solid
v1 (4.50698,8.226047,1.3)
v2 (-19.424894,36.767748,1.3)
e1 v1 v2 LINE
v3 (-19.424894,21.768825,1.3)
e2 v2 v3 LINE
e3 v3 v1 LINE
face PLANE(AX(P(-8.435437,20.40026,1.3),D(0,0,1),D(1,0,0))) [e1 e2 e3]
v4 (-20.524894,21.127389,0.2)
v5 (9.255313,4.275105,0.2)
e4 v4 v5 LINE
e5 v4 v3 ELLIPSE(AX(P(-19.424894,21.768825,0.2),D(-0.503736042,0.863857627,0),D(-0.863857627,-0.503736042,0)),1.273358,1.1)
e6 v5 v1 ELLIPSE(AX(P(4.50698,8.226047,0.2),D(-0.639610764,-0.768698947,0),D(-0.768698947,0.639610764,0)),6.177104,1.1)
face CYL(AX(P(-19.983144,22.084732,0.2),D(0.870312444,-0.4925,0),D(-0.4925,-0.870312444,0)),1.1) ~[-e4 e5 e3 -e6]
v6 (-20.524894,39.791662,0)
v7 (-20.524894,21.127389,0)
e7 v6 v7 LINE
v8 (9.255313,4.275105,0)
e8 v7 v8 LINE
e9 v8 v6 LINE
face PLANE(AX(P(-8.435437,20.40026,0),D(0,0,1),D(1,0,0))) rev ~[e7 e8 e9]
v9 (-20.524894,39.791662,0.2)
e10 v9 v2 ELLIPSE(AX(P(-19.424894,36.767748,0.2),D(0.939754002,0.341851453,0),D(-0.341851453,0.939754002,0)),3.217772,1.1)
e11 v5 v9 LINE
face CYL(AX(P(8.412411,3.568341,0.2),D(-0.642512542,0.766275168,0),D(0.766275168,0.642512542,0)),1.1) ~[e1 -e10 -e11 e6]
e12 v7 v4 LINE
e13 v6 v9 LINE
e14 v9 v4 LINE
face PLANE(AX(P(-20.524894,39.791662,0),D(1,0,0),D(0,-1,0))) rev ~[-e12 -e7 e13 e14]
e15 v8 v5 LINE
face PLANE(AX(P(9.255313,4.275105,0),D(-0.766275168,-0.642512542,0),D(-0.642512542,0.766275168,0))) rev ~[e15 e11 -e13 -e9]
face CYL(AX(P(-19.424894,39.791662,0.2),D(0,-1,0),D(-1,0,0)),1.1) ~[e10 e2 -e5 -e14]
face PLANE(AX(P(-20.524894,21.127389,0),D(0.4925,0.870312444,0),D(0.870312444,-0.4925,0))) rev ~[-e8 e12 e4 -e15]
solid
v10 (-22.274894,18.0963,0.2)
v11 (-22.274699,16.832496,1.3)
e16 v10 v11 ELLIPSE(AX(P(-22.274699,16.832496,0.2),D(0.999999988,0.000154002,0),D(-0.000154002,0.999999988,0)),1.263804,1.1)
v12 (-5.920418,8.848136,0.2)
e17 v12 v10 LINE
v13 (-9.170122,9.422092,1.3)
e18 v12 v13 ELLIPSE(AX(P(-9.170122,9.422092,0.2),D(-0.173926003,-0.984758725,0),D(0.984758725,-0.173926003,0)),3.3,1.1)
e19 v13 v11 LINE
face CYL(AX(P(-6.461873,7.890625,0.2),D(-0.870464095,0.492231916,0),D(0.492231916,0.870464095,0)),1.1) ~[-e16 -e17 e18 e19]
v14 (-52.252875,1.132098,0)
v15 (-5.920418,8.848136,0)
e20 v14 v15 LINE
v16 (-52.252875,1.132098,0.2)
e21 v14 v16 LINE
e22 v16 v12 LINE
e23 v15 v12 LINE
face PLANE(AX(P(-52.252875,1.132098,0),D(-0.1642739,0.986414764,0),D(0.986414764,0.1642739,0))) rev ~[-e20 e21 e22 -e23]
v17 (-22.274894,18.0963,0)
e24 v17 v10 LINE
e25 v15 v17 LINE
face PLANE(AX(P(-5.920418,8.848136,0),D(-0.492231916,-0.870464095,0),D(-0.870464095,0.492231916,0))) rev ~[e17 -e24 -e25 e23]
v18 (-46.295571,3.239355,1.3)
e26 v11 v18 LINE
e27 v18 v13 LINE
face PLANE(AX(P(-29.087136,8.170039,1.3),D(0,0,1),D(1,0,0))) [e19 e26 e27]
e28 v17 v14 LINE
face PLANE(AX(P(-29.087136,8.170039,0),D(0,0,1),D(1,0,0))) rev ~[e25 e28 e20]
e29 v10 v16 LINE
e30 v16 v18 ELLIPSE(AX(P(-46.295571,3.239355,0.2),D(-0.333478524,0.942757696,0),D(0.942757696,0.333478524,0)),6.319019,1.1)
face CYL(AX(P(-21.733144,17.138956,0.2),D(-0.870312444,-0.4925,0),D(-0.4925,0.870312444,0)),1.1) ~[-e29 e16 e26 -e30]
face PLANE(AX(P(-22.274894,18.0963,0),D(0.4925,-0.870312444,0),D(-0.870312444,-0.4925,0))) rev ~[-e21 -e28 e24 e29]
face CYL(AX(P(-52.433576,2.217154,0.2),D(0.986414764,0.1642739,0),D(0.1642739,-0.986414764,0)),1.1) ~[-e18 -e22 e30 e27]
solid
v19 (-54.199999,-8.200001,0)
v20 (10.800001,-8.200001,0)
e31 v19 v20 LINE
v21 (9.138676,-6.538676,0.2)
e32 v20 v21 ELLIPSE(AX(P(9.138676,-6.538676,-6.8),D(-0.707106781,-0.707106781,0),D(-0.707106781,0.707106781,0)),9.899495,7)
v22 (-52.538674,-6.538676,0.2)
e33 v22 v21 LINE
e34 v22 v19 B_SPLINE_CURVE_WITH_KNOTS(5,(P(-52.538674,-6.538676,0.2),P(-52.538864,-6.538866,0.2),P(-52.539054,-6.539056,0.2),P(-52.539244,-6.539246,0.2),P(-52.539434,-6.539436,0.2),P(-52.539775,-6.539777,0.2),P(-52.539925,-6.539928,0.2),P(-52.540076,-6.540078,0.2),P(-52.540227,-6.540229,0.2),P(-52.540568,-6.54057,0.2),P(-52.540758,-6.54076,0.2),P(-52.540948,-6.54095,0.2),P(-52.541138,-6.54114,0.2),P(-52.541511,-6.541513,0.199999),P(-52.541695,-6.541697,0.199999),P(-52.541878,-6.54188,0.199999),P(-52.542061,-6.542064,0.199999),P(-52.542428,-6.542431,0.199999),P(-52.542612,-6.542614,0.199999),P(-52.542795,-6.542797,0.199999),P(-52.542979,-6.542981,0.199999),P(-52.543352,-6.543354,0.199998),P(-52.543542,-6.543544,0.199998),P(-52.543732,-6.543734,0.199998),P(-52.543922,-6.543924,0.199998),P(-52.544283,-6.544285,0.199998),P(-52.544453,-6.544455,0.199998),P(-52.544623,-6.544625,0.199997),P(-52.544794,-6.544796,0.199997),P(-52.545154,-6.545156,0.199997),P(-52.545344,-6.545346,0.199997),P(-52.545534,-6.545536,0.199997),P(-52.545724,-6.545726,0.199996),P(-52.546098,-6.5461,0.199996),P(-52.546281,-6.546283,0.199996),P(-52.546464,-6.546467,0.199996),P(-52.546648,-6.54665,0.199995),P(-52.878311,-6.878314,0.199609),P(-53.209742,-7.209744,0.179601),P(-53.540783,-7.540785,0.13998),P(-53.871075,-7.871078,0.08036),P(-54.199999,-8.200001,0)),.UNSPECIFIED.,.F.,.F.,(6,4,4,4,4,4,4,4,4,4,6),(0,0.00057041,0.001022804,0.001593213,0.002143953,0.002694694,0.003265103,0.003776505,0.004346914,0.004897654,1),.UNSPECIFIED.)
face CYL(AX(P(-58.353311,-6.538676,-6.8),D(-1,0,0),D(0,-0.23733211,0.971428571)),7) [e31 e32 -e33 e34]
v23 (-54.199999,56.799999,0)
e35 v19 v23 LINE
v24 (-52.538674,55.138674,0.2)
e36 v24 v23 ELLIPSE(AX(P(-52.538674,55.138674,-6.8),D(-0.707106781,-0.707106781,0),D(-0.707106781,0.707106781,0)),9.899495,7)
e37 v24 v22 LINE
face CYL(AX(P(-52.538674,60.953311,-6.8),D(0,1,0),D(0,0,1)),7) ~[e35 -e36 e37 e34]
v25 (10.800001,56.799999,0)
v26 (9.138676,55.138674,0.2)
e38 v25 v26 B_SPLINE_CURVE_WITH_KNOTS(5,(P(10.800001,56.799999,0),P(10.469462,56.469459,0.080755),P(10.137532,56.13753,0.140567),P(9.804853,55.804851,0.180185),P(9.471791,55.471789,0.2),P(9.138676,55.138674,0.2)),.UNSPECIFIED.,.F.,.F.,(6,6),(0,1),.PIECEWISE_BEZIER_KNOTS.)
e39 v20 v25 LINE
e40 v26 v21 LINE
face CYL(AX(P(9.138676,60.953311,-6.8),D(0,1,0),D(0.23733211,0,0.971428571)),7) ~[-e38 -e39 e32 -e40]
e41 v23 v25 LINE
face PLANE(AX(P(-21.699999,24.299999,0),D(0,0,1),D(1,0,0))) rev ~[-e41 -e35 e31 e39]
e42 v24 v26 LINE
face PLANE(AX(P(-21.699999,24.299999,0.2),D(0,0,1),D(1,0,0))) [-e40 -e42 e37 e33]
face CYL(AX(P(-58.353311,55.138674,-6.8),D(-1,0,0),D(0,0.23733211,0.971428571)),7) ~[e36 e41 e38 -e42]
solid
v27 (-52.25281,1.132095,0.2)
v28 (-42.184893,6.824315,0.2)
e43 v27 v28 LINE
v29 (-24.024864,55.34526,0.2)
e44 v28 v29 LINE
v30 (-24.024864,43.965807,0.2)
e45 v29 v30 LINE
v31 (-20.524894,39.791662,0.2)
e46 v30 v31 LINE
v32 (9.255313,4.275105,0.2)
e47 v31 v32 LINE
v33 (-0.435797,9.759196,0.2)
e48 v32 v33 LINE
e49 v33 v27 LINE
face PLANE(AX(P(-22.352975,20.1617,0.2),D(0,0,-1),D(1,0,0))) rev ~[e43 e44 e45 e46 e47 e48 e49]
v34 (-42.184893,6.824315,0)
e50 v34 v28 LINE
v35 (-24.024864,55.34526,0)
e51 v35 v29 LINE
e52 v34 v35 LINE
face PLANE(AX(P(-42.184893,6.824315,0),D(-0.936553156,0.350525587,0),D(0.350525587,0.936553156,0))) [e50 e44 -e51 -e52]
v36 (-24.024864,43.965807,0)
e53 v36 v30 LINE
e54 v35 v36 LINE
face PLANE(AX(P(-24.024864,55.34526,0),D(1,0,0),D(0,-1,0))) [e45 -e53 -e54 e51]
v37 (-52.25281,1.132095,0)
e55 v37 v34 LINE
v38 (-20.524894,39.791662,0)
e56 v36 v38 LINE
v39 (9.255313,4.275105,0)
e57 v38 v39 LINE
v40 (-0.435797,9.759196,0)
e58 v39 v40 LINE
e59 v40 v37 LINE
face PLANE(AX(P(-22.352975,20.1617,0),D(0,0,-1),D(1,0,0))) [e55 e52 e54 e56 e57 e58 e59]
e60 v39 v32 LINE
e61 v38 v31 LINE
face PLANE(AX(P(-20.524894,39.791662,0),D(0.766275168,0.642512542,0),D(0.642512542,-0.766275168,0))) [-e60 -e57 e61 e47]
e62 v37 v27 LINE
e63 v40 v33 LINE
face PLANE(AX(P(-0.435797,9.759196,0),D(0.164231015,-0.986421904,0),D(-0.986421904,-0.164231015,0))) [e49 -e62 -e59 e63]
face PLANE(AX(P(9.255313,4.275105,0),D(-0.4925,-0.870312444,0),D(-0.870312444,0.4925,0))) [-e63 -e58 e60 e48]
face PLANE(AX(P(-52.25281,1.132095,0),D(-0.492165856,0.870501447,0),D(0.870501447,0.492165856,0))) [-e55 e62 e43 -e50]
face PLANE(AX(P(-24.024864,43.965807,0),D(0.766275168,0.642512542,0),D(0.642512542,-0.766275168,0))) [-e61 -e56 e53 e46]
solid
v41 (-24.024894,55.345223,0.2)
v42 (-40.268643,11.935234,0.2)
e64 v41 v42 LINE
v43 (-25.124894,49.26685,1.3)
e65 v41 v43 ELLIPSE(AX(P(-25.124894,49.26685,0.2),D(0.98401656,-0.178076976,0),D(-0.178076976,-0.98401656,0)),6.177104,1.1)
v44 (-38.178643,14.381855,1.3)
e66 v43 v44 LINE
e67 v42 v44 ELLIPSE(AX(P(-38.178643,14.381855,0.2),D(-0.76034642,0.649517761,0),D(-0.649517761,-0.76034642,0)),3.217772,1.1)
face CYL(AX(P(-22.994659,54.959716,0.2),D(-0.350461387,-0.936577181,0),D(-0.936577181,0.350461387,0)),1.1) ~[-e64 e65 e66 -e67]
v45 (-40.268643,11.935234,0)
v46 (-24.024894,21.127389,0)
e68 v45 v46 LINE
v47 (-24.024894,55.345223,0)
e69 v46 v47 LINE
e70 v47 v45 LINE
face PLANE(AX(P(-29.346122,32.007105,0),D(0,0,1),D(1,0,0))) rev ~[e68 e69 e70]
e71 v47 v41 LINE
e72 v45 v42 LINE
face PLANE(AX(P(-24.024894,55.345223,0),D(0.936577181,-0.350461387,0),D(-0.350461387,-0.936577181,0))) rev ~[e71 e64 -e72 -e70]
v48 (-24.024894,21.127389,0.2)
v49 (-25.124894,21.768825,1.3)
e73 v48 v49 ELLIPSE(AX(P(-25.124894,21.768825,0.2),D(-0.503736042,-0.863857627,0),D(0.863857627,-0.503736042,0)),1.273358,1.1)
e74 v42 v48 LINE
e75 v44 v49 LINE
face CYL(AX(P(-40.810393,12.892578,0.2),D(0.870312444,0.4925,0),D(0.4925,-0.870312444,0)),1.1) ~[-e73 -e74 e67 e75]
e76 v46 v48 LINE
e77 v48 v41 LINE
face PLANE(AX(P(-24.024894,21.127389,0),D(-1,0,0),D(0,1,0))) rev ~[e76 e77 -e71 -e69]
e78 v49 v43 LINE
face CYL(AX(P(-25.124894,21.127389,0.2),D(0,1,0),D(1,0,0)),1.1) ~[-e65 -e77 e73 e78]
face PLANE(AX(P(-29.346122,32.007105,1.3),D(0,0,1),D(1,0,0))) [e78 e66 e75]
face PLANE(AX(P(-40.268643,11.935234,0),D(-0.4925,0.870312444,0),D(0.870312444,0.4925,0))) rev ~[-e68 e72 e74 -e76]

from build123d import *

# Parameters (mm, degrees)
F1_DEPTH    = 1.3
F2_R        = 1.1
F2_2_R      = 1.1
F2_3_R      = 1.1
F4_DEPTH    = 0.2
F5_W        = 65
F5_H        = 65
F6_DEPTH    = 0.2
F7_T1_DEPTH = 73.3066238629
F7_T3_DEPTH = 73.3066238629


# Not quite as in the source:
# - a fillet or chamfer that OpenCascade refuses, or shapes differently, is made with other operations: its cross-section is extruded or revolved along the edge and cut away or added


with BuildPart() as f1:
    # F0 (on Top) → F1 (new body)
    with BuildSketch(Plane.XY):
        Polygon((-24.0248936415, 55.3452231001), (-40.2686429682, 11.9352340698), (-24.0248936415, 21.12738868), align=None)
    extrude(amount=F1_DEPTH)

    # F2
    f2_edges = [f1.edges().sort_by_distance(p)[0] for p in [
        (-32.146768, 33.640229, 1.3),
        (-32.146768, 16.531311, 1.3),
        (-24.024894, 38.236306, 1.3),
    ]]
    fillet(f2_edges, radius=F2_R)


with BuildPart() as f1b:
    # F0 (on Top) → F1, piece 2 (new body)
    with BuildSketch(Plane.XY):
        Polygon((9.2553134576, 4.275105228), (-20.5248936415, 39.791662), (-20.5248936415, 21.12738868), align=None)
    extrude(amount=F1_DEPTH)

    # F2#2
    f2_2_edges = [f1b.edges().sort_by_distance(p)[0] for p in [
        (-5.63479, 22.033384, 1.3),
        (-20.524894, 30.459525, 1.3),
        (-5.63479, 12.701247, 1.3),
    ]]
    fillet(f2_2_edges, radius=F2_2_R)


with BuildPart() as f1c:
    # F0 (on Top) → F1, piece 3 (new body)
    with BuildSketch(Plane.XY):
        Polygon((-52.2528748298, 1.1320981874), (-5.9204182833, 8.8481357249), (-22.2748936415, 18.0962997667), align=None)
    extrude(amount=F1_DEPTH)

    # F2#3
    f2_3_edges = [f1c.edges().sort_by_distance(p)[0] for p in [
        (-29.086647, 4.990117, 1.3),
        (-14.097656, 13.472218, 1.3),
        (-37.263884, 9.614199, 1.3),
    ]]
    fillet(f2_3_edges, radius=F2_3_R)


with BuildPart() as f4:
    # F3 (on face) → F4 (new body)
    with BuildSketch(Plane(origin=(0, 0, 0), x_dir=(1, 0, 0), z_dir=(0, 0, -1))):
        Polygon((-20.5248936415, -39.791662), (9.2553134576, -4.275105228), (-0.4357972381, -9.759195512), (-52.2528104484, -1.1320952326), (-42.1848930418, -6.8243145943), (-24.0248637821, -55.3452596068), (-24.0248637821, -43.9658065178), align=None)
    extrude(amount=-F4_DEPTH)


with BuildPart() as f6:
    # F5 (on Top) → F6 (new body)
    with BuildSketch(Plane.XY):
        with Locations((-21.6999987885, 24.2999990284)):
            Rectangle(F5_W, F5_H)
    extrude(amount=F6_DEPTH)

    # F7: fillet of radius 7 on 4 edges, made by hand

    # F7_s2 → F7_t1 (cut)
    with BuildSketch(Plane.YZ.offset(-58.35331072)):
        with BuildLine():
            ThreePointArc((-8.2000009716, 0), (-7.3753362255, 0.1498201416), (-6.538676199, 0.2))
            Line((-6.538676199, 0.2), (-8.2000009716, 0.2))
            Line((-8.2000009716, 0.2), (-8.2000009716, 0))
        make_face()
        with BuildLine():
            ThreePointArc((56.7999990284, 0), (55.9753342824, 0.1498201416), (55.1386742559, 0.2))
            Line((55.1386742559, 0.2), (56.7999990284, 0.2))
            Line((56.7999990284, 0.2), (56.7999990284, 0))
        make_face()
    extrude(amount=F7_T1_DEPTH, mode=Mode.SUBTRACT)

    # F7_s4 → F7_t3 (cut)
    with BuildSketch(Plane.XZ.offset(-60.9533109599)):
        with BuildLine():
            ThreePointArc((10.8000012115, 0), (9.9753364654, 0.1498201416), (9.1386764389, 0.2))
            Line((9.1386764389, 0.2), (10.8000012115, 0.2))
            Line((10.8000012115, 0.2), (10.8000012115, 0))
        make_face()
        with BuildLine():
            ThreePointArc((-52.538674016, 0.2), (-53.3753340425, 0.1498201416), (-54.1999987885, 0))
            Line((-54.1999987885, 0), (-54.1999987885, 0.2))
            Line((-54.1999987885, 0.2), (-52.538674016, 0.2))
        make_face()
    extrude(amount=F7_T3_DEPTH, mode=Mode.SUBTRACT)


solid = Compound([f1.part, f1b.part, f1c.part, f4.part, f6.part])
